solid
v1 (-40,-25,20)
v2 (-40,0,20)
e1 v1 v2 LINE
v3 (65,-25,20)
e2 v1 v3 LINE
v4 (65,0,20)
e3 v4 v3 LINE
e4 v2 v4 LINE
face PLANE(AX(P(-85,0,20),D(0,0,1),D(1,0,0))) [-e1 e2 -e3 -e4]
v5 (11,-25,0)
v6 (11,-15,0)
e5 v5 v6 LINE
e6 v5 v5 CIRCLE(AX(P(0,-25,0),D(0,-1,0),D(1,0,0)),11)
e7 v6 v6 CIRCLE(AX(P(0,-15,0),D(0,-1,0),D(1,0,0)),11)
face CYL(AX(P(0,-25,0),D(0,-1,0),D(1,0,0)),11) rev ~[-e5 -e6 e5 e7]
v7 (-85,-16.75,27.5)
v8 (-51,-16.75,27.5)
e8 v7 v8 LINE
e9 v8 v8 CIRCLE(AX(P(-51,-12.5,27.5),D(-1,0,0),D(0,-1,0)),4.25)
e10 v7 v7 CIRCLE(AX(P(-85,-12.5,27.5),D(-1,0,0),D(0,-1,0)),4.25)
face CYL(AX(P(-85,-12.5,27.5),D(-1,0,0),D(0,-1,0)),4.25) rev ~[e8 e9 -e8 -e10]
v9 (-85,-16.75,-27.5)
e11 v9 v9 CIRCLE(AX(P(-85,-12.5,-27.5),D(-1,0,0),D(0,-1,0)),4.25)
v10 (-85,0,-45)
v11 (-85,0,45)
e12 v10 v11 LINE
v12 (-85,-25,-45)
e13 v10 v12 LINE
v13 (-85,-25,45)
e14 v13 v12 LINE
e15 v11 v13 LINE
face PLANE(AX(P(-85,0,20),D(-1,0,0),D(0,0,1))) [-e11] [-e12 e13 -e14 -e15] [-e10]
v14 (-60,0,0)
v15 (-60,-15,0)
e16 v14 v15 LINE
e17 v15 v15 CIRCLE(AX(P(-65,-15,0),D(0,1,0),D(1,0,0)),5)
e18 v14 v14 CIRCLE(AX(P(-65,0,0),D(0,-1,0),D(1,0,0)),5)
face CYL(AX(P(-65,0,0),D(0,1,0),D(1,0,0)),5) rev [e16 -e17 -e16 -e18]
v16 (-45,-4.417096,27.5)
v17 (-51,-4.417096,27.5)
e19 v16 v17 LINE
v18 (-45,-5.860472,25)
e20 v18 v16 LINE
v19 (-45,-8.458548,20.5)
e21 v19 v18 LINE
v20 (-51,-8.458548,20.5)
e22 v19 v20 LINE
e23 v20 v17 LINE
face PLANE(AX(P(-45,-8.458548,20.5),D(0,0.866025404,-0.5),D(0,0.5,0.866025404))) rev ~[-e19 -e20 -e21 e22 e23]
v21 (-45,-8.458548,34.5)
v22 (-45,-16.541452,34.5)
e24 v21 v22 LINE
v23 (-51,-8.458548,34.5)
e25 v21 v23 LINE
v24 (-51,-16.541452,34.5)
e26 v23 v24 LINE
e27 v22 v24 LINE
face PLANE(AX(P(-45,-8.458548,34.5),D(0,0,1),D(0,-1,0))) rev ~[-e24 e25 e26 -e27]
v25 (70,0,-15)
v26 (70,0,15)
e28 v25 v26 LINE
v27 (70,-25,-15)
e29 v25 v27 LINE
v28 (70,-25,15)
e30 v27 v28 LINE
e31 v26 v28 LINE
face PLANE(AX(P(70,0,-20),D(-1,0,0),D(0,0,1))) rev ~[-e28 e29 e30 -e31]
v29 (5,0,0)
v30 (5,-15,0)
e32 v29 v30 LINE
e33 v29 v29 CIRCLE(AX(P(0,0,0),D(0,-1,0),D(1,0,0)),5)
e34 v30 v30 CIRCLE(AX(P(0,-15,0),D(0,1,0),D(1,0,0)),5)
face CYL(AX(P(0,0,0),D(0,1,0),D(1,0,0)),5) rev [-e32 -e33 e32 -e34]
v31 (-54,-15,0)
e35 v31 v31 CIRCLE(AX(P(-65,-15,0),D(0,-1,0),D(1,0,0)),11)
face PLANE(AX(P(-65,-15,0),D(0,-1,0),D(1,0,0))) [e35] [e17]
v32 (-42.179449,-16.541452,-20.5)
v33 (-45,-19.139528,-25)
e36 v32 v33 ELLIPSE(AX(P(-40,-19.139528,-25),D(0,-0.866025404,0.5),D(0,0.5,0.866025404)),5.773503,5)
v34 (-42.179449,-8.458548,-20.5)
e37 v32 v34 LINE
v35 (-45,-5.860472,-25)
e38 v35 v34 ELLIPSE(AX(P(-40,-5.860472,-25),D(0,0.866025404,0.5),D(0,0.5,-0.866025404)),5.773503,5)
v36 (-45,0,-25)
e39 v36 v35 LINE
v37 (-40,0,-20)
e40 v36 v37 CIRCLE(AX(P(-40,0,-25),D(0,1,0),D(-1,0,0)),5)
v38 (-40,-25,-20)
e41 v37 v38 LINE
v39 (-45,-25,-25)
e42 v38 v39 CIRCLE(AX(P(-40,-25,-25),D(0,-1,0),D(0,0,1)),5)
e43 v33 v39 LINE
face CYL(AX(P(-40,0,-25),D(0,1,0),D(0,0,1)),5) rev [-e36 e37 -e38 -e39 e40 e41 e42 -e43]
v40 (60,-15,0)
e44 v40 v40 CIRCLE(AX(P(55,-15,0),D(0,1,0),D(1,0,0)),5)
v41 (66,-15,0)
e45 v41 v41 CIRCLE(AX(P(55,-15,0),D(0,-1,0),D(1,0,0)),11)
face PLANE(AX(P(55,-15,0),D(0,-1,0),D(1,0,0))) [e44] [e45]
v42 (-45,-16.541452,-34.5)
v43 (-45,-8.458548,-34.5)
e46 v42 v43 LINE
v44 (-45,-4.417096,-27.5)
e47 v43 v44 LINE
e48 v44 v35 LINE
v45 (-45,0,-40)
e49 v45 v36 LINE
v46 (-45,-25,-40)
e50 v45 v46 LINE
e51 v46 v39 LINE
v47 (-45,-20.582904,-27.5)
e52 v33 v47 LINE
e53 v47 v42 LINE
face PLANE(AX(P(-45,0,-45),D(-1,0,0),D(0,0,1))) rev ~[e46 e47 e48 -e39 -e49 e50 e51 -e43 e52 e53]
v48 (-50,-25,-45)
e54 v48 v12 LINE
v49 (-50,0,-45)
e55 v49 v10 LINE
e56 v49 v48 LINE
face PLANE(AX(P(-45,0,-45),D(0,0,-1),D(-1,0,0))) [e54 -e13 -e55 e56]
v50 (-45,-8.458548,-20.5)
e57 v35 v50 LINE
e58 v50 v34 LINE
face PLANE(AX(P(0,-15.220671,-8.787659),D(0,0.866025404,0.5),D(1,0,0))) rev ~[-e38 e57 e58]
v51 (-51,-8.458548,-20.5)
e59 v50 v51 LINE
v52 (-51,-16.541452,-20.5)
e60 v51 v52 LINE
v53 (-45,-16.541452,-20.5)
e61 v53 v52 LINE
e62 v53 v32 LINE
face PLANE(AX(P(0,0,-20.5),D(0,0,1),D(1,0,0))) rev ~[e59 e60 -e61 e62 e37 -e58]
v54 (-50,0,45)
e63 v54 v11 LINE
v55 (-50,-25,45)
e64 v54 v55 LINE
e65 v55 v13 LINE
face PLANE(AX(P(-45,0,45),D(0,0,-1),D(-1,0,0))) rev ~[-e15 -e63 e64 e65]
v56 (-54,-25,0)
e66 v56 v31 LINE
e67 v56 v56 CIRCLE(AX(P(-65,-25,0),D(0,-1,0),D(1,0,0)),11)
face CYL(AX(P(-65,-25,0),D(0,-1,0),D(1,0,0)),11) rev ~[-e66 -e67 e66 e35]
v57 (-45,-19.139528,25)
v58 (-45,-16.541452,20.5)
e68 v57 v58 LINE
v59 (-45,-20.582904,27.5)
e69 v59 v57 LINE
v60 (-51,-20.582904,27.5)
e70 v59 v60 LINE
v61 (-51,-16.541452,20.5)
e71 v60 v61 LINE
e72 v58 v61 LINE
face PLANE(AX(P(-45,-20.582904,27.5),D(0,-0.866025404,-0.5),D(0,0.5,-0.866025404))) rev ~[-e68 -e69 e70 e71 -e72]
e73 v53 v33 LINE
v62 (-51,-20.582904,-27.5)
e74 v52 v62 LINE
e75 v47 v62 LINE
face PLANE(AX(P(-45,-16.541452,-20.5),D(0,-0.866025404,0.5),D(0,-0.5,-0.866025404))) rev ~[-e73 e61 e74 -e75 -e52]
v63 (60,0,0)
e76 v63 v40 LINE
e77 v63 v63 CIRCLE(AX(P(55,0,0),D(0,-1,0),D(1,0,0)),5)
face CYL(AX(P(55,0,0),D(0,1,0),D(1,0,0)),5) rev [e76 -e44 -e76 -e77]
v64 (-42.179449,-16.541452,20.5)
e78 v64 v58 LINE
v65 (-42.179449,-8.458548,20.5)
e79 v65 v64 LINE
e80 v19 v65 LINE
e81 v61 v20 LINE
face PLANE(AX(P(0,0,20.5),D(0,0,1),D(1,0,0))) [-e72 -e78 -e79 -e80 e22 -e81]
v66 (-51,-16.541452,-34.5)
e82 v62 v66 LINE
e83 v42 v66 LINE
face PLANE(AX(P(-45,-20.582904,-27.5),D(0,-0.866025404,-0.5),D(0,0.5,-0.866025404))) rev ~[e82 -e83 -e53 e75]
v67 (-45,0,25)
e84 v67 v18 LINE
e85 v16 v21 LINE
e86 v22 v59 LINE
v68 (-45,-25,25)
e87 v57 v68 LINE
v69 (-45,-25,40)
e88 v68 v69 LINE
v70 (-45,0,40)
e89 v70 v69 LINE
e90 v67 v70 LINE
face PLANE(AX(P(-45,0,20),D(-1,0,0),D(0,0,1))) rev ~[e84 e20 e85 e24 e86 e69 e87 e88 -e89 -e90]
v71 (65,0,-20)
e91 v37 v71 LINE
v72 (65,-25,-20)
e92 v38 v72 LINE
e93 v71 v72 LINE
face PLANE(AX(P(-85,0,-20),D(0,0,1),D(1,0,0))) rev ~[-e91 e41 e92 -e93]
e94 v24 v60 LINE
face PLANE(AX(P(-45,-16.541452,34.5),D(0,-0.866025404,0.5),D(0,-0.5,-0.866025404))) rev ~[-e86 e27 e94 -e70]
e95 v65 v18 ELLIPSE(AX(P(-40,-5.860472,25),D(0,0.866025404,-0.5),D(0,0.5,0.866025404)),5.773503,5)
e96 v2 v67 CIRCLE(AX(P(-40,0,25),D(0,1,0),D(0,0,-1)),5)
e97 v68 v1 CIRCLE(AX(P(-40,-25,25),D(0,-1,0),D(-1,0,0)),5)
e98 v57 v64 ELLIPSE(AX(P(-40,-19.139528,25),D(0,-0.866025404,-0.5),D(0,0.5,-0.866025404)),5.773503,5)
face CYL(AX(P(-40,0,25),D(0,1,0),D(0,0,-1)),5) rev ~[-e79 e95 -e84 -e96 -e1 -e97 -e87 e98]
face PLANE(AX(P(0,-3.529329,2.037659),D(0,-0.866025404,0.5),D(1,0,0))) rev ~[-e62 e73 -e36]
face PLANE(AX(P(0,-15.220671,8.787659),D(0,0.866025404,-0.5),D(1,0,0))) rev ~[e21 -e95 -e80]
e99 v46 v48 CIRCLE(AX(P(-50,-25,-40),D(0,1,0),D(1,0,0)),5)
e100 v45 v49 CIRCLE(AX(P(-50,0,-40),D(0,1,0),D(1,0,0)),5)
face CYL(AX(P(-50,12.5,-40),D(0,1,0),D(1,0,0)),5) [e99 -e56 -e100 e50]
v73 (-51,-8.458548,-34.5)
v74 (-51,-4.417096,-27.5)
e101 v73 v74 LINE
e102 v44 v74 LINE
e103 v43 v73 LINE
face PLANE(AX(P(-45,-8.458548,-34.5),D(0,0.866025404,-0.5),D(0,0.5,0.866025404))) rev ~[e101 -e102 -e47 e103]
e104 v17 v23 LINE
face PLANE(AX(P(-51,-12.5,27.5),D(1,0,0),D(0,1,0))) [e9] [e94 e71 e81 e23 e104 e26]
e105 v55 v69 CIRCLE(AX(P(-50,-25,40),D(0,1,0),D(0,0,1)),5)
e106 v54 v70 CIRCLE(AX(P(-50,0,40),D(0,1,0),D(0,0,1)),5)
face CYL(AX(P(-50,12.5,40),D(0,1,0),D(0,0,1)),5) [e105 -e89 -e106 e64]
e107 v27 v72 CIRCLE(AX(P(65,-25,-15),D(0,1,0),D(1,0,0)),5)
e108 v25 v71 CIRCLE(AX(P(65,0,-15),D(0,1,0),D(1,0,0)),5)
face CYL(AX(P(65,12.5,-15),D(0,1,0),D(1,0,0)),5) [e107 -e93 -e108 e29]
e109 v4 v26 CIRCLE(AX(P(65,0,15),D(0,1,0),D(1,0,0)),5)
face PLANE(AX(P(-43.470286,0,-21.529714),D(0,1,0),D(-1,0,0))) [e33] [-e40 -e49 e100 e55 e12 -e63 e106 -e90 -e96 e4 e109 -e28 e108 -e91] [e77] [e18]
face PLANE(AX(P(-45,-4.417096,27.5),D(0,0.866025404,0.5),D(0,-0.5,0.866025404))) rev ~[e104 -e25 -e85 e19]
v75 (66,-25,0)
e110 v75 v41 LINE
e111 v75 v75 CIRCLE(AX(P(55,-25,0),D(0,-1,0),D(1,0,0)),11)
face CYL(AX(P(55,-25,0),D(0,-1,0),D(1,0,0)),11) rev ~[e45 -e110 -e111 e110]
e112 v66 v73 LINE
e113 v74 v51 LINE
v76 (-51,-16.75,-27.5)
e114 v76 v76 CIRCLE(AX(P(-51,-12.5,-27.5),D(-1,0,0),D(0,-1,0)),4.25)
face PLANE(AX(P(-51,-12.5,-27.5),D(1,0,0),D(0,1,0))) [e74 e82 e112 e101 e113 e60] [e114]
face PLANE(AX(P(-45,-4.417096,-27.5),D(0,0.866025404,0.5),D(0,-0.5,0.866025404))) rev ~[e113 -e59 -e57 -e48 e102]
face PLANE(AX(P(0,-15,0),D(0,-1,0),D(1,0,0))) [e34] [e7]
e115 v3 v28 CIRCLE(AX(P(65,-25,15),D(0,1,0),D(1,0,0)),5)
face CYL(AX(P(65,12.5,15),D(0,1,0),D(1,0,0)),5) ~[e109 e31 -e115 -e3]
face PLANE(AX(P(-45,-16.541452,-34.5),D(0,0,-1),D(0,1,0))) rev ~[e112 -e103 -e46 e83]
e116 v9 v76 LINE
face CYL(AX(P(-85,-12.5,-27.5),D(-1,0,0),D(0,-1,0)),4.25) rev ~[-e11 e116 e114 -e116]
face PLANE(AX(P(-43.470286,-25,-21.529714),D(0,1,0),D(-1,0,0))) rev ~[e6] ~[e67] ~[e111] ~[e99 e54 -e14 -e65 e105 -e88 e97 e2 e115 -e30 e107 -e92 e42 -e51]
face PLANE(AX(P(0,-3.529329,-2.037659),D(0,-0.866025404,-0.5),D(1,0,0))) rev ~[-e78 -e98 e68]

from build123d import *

# Parameters (mm, degrees)
F0_W          = 155
F0_H          = 40
F0_R          = 5
F1_DEPTH      = 25
F2_R          = 11
F3_DEPTH      = 10
F4_W          = 40
F4_H          = 25
F5_DEPTH      = 25
F6_R          = 4.25
F7_DEPTH      = 40
F9_DEPTH      = 6
F10_T4_DEPTH  = 25
F10_T10_DEPTH = 25
F10_T16_DEPTH = 25
F10_T23_DEPTH = 25
F10_T29_DEPTH = 25
F10_T35_DEPTH = 25
F10_T41_DEPTH = 25
F10_T47_DEPTH = 25
F10_T54_DEPTH = 25
F10_T60_DEPTH = 25
F10_T63_DEPTH = 50


# Not quite as in the source:
# - a fillet or chamfer that OpenCascade refuses, or shapes differently, is made with other operations: its cross-section is extruded or revolved along the edge and cut away or added


with BuildPart() as f1:
    # F0 (on Front) → F1 (new body)
    with BuildSketch(Plane.XZ):
        with Locations((-7.5, 0)):
            Rectangle(F0_W, F0_H)
        with Locations((-65, 0)):
            Circle(F0_R, mode=Mode.SUBTRACT)
        Circle(F0_R, mode=Mode.SUBTRACT)
        with Locations((55, 0)):
            Circle(F0_R, mode=Mode.SUBTRACT)
    extrude(amount=F1_DEPTH)

    # F2 (on face) → F3 (cut)
    with BuildSketch(Plane.XZ.offset(25)):
        with Locations((-65, 0)):
            Circle(F2_R)
        Circle(F2_R)
        with Locations((55, 0)):
            Circle(F2_R)
    extrude(amount=-F3_DEPTH, mode=Mode.SUBTRACT)

    # F4 (on face) → F5 (join)
    with BuildSketch(Plane(origin=(0, 0, 0), x_dir=(-1, 0, 0), z_dir=(0, 1, 0))):
        with Locations((65, 32.5)):
            Rectangle(F4_W, F4_H)
        with Locations((65, -32.5)):
            Rectangle(F4_W, F4_H)
    extrude(amount=-F5_DEPTH)

    # F6 (on face) → F7 (cut, through all)
    with BuildSketch(Plane(origin=(-85, 0, 0), x_dir=(0, -1, 0), z_dir=(-1, 0, 0))):
        with Locations((12.5, 27.5)):
            Circle(F6_R)
        with Locations((12.5, -27.5)):
            Circle(F6_R)
    extrude(amount=-F7_DEPTH, mode=Mode.SUBTRACT)

    # F8 (on face) → F9 (cut)
    with BuildSketch(Plane.YZ.offset(-45)):
        Polygon((-8.4585481157, 34.5), (-16.5414518843, 34.5), (-20.5829037687, 27.5), (-16.5414518843, 20.5), (-8.4585481157, 20.5), (-4.4170962313, 27.5), align=None)
        Polygon((-8.4585481157, -20.5), (-16.5414518843, -20.5), (-20.5829037687, -27.5), (-16.5414518843, -34.5), (-8.4585481157, -34.5), (-4.4170962313, -27.5), align=None)
    extrude(amount=-F9_DEPTH, mode=Mode.SUBTRACT)

    # F10: fillet of radius 5 on 6 edges, made by hand


with BuildPart() as f10_tool2:
    # F10_s3 → F10_t4 (new body)
    with BuildSketch(Plane.XZ):
        with BuildLine():
            ThreePointArc((-40, 20), (-43.5355339059, 21.4644660941), (-45, 25))
            Line((-45, 25), (-45, 20))
            Line((-45, 20), (-40, 20))
        make_face()
    extrude(amount=F10_T4_DEPTH)

    split(bisect_by=Plane.XY.offset(20.5), keep=Keep.BOTTOM)

    split(bisect_by=Plane(origin=(0, -15.2206714755, 8.7876587737), x_dir=(1, 0, 0), z_dir=(0, 0.8660254038, -0.5)), keep=Keep.TOP)


with BuildPart() as f1_1:
    add(f1.part)

    # F10_t1: union F10_tool2
    add(f10_tool2.part)


with BuildPart() as f10_tool8:
    # F10_s9 → F10_t10 (new body)
    with BuildSketch(Plane.XZ):
        with BuildLine():
            ThreePointArc((-40, 20), (-43.5355339059, 21.4644660941), (-45, 25))
            Line((-45, 25), (-45, 20))
            Line((-45, 20), (-40, 20))
        make_face()
    extrude(amount=F10_T10_DEPTH)

    split(bisect_by=Plane.XY.offset(20.5), keep=Keep.TOP)

    split(bisect_by=Plane(origin=(0, -15.2206714755, 8.7876587737), x_dir=(1, 0, 0), z_dir=(0, 0.8660254038, -0.5)), keep=Keep.TOP)


with BuildPart() as f1_2:
    add(f1_1.part)

    # F10_t7: union F10_tool8
    add(f10_tool8.part)


with BuildPart() as f10_tool14:
    # F10_s15 → F10_t16 (new body)
    with BuildSketch(Plane.XZ):
        with BuildLine():
            ThreePointArc((-40, 20), (-43.5355339059, 21.4644660941), (-45, 25))
            Line((-45, 25), (-45, 20))
            Line((-45, 20), (-40, 20))
        make_face()
    extrude(amount=F10_T16_DEPTH)

    split(bisect_by=Plane(origin=(0, -3.5293285245, -2.0376587737), x_dir=(1, 0, 0), z_dir=(0, 0.8660254038, 0.5)), keep=Keep.TOP)

    split(bisect_by=Plane.XY.offset(20.5), keep=Keep.BOTTOM)

    split(bisect_by=Plane(origin=(0, -15.2206714755, 8.7876587737), x_dir=(1, 0, 0), z_dir=(0, -0.8660254038, 0.5)), keep=Keep.TOP)


with BuildPart() as f1_3:
    add(f1_2.part)

    # F10_t13: union F10_tool14
    add(f10_tool14.part)


with BuildPart() as f10_tool21:
    # F10_s22 → F10_t23 (new body)
    with BuildSketch(Plane.XZ):
        with BuildLine():
            ThreePointArc((-40, 20), (-43.5355339059, 21.4644660941), (-45, 25))
            Line((-45, 25), (-45, 20))
            Line((-45, 20), (-40, 20))
        make_face()
    extrude(amount=F10_T23_DEPTH)

    split(bisect_by=Plane(origin=(0, -3.5293285245, -2.0376587737), x_dir=(1, 0, 0), z_dir=(0, -0.8660254038, -0.5)), keep=Keep.TOP)

    split(bisect_by=Plane.XY.offset(20.5), keep=Keep.BOTTOM)


with BuildPart() as f1_4:
    add(f1_3.part)

    # F10_t20: union F10_tool21
    add(f10_tool21.part)


with BuildPart() as f10_tool27:
    # F10_s28 → F10_t29 (new body)
    with BuildSketch(Plane.XZ):
        with BuildLine():
            ThreePointArc((-40, 20), (-43.5355339059, 21.4644660941), (-45, 25))
            Line((-45, 25), (-45, 20))
            Line((-45, 20), (-40, 20))
        make_face()
    extrude(amount=F10_T29_DEPTH)

    split(bisect_by=Plane(origin=(0, -3.5293285245, -2.0376587737), x_dir=(1, 0, 0), z_dir=(0, -0.8660254038, -0.5)), keep=Keep.TOP)

    split(bisect_by=Plane.XY.offset(20.5), keep=Keep.TOP)


with BuildPart() as f1_5:
    add(f1_4.part)

    # F10_t26: union F10_tool27
    add(f10_tool27.part)


with BuildPart() as f10_tool33:
    # F10_s34 → F10_t35 (new body)
    with BuildSketch(Plane.XZ):
        with BuildLine():
            ThreePointArc((-40, -20), (-43.5355339059, -21.4644660941), (-45, -25))
            Line((-45, -25), (-45, -20))
            Line((-45, -20), (-40, -20))
        make_face()
    extrude(amount=F10_T35_DEPTH)

    split(bisect_by=Plane.XY.offset(-20.5), keep=Keep.TOP)

    split(bisect_by=Plane(origin=(0, -15.2206714755, -8.7876587737), x_dir=(1, 0, 0), z_dir=(0, 0.8660254038, 0.5)), keep=Keep.TOP)


with BuildPart() as f1_6:
    add(f1_5.part)

    # F10_t32: union F10_tool33
    add(f10_tool33.part)


with BuildPart() as f10_tool39:
    # F10_s40 → F10_t41 (new body)
    with BuildSketch(Plane.XZ):
        with BuildLine():
            ThreePointArc((-40, -20), (-43.5355339059, -21.4644660941), (-45, -25))
            Line((-45, -25), (-45, -20))
            Line((-45, -20), (-40, -20))
        make_face()
    extrude(amount=F10_T41_DEPTH)

    split(bisect_by=Plane.XY.offset(-20.5), keep=Keep.BOTTOM)

    split(bisect_by=Plane(origin=(0, -15.2206714755, -8.7876587737), x_dir=(1, 0, 0), z_dir=(0, 0.8660254038, 0.5)), keep=Keep.TOP)


with BuildPart() as f1_7:
    add(f1_6.part)

    # F10_t38: union F10_tool39
    add(f10_tool39.part)


with BuildPart() as f10_tool45:
    # F10_s46 → F10_t47 (new body)
    with BuildSketch(Plane.XZ):
        with BuildLine():
            ThreePointArc((-40, -20), (-43.5355339059, -21.4644660941), (-45, -25))
            Line((-45, -25), (-45, -20))
            Line((-45, -20), (-40, -20))
        make_face()
    extrude(amount=F10_T47_DEPTH)

    split(bisect_by=Plane.XY.offset(-20.5), keep=Keep.TOP)

    split(bisect_by=Plane(origin=(0, -3.5293285245, 2.0376587737), x_dir=(1, 0, 0), z_dir=(0, 0.8660254038, -0.5)), keep=Keep.TOP)

    split(bisect_by=Plane(origin=(0, -15.2206714755, -8.7876587737), x_dir=(1, 0, 0), z_dir=(0, -0.8660254038, -0.5)), keep=Keep.TOP)


with BuildPart() as f1_8:
    add(f1_7.part)

    # F10_t44: union F10_tool45
    add(f10_tool45.part)


with BuildPart() as f10_tool52:
    # F10_s53 → F10_t54 (new body)
    with BuildSketch(Plane.XZ):
        with BuildLine():
            ThreePointArc((-40, -20), (-43.5355339059, -21.4644660941), (-45, -25))
            Line((-45, -25), (-45, -20))
            Line((-45, -20), (-40, -20))
        make_face()
    extrude(amount=F10_T54_DEPTH)

    split(bisect_by=Plane.XY.offset(-20.5), keep=Keep.TOP)

    split(bisect_by=Plane(origin=(0, -3.5293285245, 2.0376587737), x_dir=(1, 0, 0), z_dir=(0, -0.8660254038, 0.5)), keep=Keep.TOP)


with BuildPart() as f1_9:
    add(f1_8.part)

    # F10_t51: union F10_tool52
    add(f10_tool52.part)


with BuildPart() as f10_tool58:
    # F10_s59 → F10_t60 (new body)
    with BuildSketch(Plane.XZ):
        with BuildLine():
            ThreePointArc((-40, -20), (-43.5355339059, -21.4644660941), (-45, -25))
            Line((-45, -25), (-45, -20))
            Line((-45, -20), (-40, -20))
        make_face()
    extrude(amount=F10_T60_DEPTH)

    split(bisect_by=Plane.XY.offset(-20.5), keep=Keep.BOTTOM)

    split(bisect_by=Plane(origin=(0, -3.5293285245, 2.0376587737), x_dir=(1, 0, 0), z_dir=(0, -0.8660254038, 0.5)), keep=Keep.TOP)


with BuildPart() as f1_10:
    add(f1_9.part)

    # F10_t57: union F10_tool58
    add(f10_tool58.part)

    # F10_s64 → F10_t63 (cut)
    with BuildSketch(Plane.XZ.offset(-12.5)):
        with BuildLine():
            ThreePointArc((-50, 45), (-46.4644660941, 43.5355339059), (-45, 40))
            Line((-45, 40), (-45, 45))
            Line((-45, 45), (-50, 45))
        make_face()
        with BuildLine():
            ThreePointArc((-45, -40), (-46.4644660941, -43.5355339059), (-50, -45))
            Line((-50, -45), (-45, -45))
            Line((-45, -45), (-45, -40))
        make_face()
        with BuildLine():
            ThreePointArc((70, -15), (68.5355339059, -18.5355339059), (65, -20))
            Line((65, -20), (70, -20))
            Line((70, -20), (70, -15))
        make_face()
        with BuildLine():
            ThreePointArc((70, 15), (68.5355339059, 18.5355339059), (65, 20))
            Line((65, 20), (70, 20))
            Line((70, 20), (70, 15))
        make_face()
    extrude(amount=F10_T63_DEPTH, mode=Mode.SUBTRACT)


solid = f1_10.part
